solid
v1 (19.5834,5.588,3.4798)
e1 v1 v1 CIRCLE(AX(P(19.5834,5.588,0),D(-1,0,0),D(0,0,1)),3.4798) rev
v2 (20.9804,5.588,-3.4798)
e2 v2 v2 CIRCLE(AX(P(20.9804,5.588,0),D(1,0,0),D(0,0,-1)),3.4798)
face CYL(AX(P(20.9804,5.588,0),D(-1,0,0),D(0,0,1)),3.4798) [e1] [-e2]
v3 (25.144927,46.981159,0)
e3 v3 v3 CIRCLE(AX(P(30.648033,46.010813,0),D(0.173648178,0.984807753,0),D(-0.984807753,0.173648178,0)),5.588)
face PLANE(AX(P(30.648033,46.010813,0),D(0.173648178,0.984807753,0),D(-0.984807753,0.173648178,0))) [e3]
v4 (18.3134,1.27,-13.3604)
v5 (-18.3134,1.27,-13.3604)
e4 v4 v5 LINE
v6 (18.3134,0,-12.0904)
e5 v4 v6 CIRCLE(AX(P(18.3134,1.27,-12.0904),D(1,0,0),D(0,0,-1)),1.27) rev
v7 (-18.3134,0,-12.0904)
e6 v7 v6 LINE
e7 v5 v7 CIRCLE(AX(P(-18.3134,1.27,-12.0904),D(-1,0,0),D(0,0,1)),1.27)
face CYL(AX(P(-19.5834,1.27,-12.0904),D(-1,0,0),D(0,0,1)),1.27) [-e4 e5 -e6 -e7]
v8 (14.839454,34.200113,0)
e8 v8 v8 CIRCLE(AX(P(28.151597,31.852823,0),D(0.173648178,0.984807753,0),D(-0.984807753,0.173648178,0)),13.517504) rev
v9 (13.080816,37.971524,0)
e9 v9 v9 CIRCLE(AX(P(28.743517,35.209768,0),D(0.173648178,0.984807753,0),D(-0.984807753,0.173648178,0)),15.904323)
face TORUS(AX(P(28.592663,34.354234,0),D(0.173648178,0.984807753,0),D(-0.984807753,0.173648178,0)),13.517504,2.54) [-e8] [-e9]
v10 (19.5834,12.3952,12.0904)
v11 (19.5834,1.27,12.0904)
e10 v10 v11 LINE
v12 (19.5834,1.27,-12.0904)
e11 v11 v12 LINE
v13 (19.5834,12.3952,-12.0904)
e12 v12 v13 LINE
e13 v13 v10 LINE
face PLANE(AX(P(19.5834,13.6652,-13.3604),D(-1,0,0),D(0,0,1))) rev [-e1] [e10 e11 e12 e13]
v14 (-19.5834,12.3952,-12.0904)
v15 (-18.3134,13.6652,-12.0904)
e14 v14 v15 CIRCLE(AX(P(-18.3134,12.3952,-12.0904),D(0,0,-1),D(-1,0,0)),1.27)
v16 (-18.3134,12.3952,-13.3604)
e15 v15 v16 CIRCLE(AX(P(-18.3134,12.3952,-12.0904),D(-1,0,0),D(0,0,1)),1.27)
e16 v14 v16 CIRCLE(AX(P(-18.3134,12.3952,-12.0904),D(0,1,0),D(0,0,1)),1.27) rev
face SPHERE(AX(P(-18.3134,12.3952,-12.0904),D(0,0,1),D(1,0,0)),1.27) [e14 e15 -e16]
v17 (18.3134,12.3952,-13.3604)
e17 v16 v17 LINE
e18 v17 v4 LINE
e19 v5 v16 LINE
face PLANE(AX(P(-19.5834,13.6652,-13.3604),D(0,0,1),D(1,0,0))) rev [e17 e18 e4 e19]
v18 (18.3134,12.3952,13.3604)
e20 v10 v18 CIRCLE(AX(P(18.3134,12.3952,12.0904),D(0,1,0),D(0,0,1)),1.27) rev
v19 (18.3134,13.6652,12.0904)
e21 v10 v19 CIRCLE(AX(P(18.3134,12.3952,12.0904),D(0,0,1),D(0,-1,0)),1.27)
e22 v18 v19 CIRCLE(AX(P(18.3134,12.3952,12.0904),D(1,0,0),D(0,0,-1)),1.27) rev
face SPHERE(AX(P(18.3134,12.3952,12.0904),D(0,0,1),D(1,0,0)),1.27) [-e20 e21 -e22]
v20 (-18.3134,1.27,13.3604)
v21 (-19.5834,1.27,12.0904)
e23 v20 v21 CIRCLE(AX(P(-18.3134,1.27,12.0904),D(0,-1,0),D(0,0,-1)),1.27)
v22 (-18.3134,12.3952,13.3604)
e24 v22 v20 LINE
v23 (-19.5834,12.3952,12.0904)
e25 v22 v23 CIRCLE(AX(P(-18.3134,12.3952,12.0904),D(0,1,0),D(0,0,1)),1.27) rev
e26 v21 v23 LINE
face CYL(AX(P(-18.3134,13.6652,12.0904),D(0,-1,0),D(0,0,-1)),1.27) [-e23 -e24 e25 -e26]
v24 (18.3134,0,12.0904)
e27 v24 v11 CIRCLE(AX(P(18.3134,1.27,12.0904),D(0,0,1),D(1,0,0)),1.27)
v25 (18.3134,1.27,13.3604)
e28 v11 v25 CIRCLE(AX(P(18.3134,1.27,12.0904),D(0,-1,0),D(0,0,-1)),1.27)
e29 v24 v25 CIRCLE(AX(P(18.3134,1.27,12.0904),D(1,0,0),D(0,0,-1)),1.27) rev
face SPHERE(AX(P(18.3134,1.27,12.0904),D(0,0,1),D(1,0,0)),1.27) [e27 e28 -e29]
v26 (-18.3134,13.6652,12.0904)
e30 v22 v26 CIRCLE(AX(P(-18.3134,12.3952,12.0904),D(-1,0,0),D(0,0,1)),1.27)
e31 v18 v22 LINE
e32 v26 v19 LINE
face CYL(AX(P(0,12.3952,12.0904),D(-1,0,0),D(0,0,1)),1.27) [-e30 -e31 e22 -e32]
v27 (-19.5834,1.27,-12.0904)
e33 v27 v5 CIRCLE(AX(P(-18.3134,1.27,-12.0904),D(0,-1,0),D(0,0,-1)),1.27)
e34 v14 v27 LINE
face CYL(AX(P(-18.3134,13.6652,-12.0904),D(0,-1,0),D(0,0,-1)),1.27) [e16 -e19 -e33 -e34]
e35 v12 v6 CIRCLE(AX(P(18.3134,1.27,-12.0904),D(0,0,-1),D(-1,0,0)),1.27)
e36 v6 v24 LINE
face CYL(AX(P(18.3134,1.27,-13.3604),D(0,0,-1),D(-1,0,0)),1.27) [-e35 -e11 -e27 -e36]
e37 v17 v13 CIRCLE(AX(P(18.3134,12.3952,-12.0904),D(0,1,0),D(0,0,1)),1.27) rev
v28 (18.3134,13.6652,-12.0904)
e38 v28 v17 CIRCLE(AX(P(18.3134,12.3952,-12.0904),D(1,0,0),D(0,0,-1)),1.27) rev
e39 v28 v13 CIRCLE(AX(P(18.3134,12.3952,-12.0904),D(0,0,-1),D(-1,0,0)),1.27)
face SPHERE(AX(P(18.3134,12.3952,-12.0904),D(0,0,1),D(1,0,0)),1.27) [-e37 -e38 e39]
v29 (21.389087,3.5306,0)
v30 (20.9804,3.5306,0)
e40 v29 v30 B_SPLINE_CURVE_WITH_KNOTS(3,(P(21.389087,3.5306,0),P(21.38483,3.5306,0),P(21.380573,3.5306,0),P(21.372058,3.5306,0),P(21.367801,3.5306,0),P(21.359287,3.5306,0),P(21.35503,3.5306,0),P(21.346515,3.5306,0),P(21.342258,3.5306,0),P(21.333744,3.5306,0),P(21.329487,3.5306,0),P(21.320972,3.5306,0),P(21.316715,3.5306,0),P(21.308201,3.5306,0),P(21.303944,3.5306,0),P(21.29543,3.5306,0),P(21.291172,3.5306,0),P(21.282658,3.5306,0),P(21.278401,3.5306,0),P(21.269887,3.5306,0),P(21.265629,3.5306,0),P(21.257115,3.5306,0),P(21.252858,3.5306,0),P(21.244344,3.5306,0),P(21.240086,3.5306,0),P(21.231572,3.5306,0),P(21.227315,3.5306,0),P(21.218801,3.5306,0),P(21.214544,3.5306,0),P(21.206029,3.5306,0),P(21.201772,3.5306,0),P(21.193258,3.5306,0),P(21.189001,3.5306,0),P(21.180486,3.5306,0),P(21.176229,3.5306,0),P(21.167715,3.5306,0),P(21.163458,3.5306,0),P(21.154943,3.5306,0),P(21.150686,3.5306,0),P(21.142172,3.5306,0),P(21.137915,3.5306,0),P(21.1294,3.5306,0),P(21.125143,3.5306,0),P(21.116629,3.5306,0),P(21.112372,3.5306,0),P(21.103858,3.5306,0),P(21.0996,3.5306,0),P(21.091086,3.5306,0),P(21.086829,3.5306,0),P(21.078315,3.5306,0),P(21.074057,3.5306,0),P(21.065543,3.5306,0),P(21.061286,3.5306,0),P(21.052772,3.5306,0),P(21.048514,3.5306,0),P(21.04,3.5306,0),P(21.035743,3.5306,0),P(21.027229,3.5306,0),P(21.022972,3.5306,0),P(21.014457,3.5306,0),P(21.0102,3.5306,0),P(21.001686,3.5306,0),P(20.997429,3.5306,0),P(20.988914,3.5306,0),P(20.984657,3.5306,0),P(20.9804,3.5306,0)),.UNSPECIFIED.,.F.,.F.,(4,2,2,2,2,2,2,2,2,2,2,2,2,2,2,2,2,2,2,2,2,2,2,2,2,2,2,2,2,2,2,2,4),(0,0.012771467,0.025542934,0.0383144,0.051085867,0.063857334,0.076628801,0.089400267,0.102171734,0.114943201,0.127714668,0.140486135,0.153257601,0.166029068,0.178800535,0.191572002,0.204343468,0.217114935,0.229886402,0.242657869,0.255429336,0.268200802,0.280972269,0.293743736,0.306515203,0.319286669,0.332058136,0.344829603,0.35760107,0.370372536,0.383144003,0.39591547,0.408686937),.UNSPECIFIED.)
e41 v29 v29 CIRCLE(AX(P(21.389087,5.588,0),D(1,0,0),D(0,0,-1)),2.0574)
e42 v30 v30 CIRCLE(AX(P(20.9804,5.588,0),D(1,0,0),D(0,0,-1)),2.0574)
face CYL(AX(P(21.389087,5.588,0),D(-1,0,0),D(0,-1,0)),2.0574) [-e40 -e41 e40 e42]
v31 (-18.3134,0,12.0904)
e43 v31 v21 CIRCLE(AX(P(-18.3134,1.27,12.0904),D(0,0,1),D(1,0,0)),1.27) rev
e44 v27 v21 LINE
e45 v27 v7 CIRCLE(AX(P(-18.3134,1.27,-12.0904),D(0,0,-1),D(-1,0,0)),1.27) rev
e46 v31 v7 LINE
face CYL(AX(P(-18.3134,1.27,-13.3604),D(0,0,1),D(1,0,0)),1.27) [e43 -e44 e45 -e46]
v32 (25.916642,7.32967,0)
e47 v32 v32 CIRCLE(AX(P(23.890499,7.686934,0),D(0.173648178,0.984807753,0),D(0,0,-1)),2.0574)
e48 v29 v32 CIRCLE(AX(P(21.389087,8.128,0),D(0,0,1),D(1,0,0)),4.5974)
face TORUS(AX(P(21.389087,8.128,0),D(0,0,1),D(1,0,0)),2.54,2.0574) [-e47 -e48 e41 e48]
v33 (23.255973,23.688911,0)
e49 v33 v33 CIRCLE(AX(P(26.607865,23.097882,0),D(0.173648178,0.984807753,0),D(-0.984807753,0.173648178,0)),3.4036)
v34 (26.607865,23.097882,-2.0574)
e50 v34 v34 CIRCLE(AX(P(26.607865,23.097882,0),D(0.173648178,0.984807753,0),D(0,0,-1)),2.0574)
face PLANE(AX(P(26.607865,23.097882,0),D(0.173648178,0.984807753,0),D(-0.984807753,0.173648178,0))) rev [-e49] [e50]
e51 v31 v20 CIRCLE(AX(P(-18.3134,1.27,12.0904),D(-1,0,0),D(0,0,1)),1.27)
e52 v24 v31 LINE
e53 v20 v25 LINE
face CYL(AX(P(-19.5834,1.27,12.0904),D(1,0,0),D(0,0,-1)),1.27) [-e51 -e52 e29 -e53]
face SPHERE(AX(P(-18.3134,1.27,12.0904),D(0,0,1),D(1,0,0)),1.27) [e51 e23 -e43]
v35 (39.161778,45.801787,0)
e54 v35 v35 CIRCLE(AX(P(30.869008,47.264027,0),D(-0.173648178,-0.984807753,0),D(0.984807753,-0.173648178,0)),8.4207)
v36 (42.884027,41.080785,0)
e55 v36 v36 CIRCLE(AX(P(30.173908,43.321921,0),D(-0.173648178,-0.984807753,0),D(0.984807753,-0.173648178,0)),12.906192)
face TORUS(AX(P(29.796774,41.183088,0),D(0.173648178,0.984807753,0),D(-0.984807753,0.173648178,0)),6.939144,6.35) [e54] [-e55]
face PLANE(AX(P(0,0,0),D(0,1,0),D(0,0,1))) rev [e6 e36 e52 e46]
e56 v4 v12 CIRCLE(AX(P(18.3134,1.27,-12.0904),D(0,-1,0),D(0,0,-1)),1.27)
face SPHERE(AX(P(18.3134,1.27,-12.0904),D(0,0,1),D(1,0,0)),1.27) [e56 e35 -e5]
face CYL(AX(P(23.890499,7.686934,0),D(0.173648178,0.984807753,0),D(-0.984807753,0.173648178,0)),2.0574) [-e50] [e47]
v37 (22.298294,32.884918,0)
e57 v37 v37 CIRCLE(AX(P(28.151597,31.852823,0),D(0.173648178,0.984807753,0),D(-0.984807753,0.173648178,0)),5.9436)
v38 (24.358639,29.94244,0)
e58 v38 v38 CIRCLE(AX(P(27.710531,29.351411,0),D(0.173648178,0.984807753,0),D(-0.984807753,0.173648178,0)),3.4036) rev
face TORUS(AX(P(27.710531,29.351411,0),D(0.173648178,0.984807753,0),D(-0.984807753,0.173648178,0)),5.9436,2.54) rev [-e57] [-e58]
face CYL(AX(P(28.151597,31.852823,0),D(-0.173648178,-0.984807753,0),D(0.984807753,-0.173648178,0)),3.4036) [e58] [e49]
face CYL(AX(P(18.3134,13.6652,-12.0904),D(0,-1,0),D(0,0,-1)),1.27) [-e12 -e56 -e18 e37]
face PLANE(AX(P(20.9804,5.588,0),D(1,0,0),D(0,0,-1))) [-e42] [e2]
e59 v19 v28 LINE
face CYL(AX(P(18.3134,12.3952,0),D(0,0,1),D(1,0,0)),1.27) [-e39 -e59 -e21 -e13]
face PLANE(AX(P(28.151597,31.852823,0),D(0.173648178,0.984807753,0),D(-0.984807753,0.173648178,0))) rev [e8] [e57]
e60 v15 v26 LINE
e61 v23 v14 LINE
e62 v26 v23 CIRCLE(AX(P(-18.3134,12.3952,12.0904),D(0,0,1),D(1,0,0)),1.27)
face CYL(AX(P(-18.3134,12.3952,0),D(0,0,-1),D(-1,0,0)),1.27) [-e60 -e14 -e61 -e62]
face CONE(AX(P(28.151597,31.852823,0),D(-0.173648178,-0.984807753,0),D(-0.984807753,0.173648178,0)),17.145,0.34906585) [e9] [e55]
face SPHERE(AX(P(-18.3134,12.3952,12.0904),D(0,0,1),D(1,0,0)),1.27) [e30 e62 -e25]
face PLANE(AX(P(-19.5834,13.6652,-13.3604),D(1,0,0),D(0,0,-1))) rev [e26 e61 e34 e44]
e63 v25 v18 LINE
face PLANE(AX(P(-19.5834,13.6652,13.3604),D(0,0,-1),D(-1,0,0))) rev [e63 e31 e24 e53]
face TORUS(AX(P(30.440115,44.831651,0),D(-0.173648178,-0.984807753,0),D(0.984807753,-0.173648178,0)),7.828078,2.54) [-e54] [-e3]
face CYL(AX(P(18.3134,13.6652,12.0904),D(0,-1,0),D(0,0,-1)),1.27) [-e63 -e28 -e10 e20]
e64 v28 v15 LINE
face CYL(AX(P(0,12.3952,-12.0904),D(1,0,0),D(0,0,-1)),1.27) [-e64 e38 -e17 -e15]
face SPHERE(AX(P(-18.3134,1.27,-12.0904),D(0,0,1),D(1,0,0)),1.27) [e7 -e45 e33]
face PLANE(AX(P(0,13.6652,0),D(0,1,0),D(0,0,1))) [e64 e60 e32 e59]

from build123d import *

# Parameters (mm, degrees)
SKETCH1_W           = 39.1668
SKETCH1_H           = 26.7208
BOSS_EXTRUDE1_DEPTH = 13.6652
SKETCH2_R           = 3.4798
BOSS_EXTRUDE2_DEPTH = 1.397
SKETCH4_R           = 2.0574
SKETCH5_R           = 3.4036
BOSS_EXTRUDE3_DEPTH = 8.89
SKETCH6_R           = 17.145
BOSS_EXTRUDE4_DEPTH = 15.8242
BOSS_EXTRUDE4_TAPER = 20
SKETCH7_R           = 5.588
CUT_EXTRUDE1_DEPTH  = 1.4478
FILLET1_R           = 2.54
FILLET2_R           = 6.35
FILLET3_R           = 2.54
FILLET4_R           = 1.27


with BuildPart() as part:
    # Sketch1 → Boss-Extrude1 (new body)
    with BuildSketch(Plane(origin=(0, 0, 0), x_dir=(1, 0, 0), z_dir=(0, 1, 0))):
        Rectangle(SKETCH1_W, SKETCH1_H)
    extrude(amount=BOSS_EXTRUDE1_DEPTH)

    # Sketch2 → Boss-Extrude2 (add)
    with BuildSketch(Plane(origin=(19.5834, 0, 0), x_dir=(0, 0, -1), z_dir=(1, 0, 0))):
        with Locations(Location((0, 5.588, 0), (0, 0, 180))):
            Circle(SKETCH2_R)
    extrude(amount=BOSS_EXTRUDE2_DEPTH)

    # Sweep1: sweep along a path in Sketch3
    with BuildLine(Plane.XY) as sweep1_path:
        Line((20.9804, 5.588), (21.389086937, 5.588))
        ThreePointArc((21.389086937, 5.588), (23.021767465, 6.182247114), (23.890498629, 7.686933629))
        Line((23.890498629, 7.686933629), (26.166798228, 20.596470156))
        Line((26.166798228, 20.596470156), (26.607864599, 23.097881849))
    # Sketch4 → Sweep1 (sweep)
    with BuildSketch(Plane(origin=(20.9804, 0, 0), x_dir=(0, 0, -1), z_dir=(1, 0, 0))):
        with Locations((0, 5.588)):
            Circle(SKETCH4_R)
    sweep(path=sweep1_path.line)

    # Sketch5 → Boss-Extrude3 (add)
    with BuildSketch(Plane(origin=(4.75229572, 26.951608321, 0), x_dir=(0.9848077530122086, -0.1736481776669279, 0), z_dir=(0.17364817766692786, 0.9848077530122085, 0))):
        with Locations(Location((22.192726257, 0, 0), (0, 0, 180))):
            Circle(SKETCH5_R)
    extrude(amount=BOSS_EXTRUDE3_DEPTH)

    # Sketch6 → Boss-Extrude4 (add)
    with BuildSketch(Plane(origin=(6.29602802, 35.706549245, 0), x_dir=(0.9848077530122085, -0.17364817766692792, 0), z_dir=(0.17364817766692792, 0.9848077530122085, 0))):
        with Locations((22.192726257, 0)):
            Circle(SKETCH6_R)
    extrude(amount=BOSS_EXTRUDE4_DEPTH, taper=BOSS_EXTRUDE4_TAPER)

    # Sketch7 → Cut-Extrude1 (cut)
    with BuildSketch(Plane(origin=(9.043871513, 51.29034409, 0), x_dir=(0.9848077530122085, -0.17364817766692794, 0), z_dir=(0.17364817766692794, 0.9848077530122086, 0))):
        with Locations(Location((22.192726257, 0, 0), (0, 0, 180))):
            Circle(SKETCH7_R)
    extrude(amount=-CUT_EXTRUDE1_DEPTH, mode=Mode.SUBTRACT)

    # Fillet1
    fillet1_edges = [part.edges().sort_by_distance(p)[0] for p in [
        (31.503488567, 31.261793835, 0),
        (11.267067973, 34.830020779, 0),
    ]]
    fillet(fillet1_edges, radius=FILLET1_R)

    # Fillet2
    fillet2_edges = [part.edges().sort_by_distance(p)[0] for p in [
        (19.686948927, 49.413682384, 0),
    ]]
    fillet(fillet2_edges, radius=FILLET2_R)

    # Fillet3
    # the kernel refuses this fillet: 2.54 mm, written as the material it takes off along each edge
    with BuildSketch(Plane(origin=(30.899440391, 47.436617618, 0), x_dir=(-0.9848077530122086, 0.1736481776669277, 0), z_dir=(0, 0, -1))) as fillet3_piece_1:
        with BuildLine():
            CenterArc((7.82807764, -2.645152148), FILLET3_R, 76.507632873, 75.367253658)
            Line((5.588, -1.4478), (5.363992236, -1.328064785))
            ThreePointArc((5.363992236, -1.328064785), (5.334, -0.7239), (5.334, 0))
            Line((5.334, 0), (5.588, 0.254))
            ThreePointArc((5.588, 0.254), (6.939144351, 0.254), (8.479962052, 0.071736277))
            Line((8.479962052, 0.071736277), (8.420699833, -0.17525358))
        make_face()
    revolve(axis=Axis((30.899440391, 47.436617618, 0), (0.17364817766692794, 0.9848077530122086, 0)), mode=Mode.SUBTRACT)

    # Fillet4
    fillet4_edges = [part.edges().sort_by_distance(p)[0] for p in [
        (19.5834, 13.6652, 0),
        (0, 13.6652, -13.3604),
        (-19.5834, 13.6652, 0),
        (0, 0, -13.3604),
        (19.5834, 0, 0),
        (0, 0, 13.3604),
        (-19.5834, 0, 0),
        (0, 13.6652, 13.3604),
        (-19.5834, 6.8326, -13.3604),
        (19.5834, 6.8326, -13.3604),
        (19.5834, 6.8326, 13.3604),
        (-19.5834, 6.8326, 13.3604),
    ]]
    fillet(fillet4_edges, radius=FILLET4_R)


solid = part.part
